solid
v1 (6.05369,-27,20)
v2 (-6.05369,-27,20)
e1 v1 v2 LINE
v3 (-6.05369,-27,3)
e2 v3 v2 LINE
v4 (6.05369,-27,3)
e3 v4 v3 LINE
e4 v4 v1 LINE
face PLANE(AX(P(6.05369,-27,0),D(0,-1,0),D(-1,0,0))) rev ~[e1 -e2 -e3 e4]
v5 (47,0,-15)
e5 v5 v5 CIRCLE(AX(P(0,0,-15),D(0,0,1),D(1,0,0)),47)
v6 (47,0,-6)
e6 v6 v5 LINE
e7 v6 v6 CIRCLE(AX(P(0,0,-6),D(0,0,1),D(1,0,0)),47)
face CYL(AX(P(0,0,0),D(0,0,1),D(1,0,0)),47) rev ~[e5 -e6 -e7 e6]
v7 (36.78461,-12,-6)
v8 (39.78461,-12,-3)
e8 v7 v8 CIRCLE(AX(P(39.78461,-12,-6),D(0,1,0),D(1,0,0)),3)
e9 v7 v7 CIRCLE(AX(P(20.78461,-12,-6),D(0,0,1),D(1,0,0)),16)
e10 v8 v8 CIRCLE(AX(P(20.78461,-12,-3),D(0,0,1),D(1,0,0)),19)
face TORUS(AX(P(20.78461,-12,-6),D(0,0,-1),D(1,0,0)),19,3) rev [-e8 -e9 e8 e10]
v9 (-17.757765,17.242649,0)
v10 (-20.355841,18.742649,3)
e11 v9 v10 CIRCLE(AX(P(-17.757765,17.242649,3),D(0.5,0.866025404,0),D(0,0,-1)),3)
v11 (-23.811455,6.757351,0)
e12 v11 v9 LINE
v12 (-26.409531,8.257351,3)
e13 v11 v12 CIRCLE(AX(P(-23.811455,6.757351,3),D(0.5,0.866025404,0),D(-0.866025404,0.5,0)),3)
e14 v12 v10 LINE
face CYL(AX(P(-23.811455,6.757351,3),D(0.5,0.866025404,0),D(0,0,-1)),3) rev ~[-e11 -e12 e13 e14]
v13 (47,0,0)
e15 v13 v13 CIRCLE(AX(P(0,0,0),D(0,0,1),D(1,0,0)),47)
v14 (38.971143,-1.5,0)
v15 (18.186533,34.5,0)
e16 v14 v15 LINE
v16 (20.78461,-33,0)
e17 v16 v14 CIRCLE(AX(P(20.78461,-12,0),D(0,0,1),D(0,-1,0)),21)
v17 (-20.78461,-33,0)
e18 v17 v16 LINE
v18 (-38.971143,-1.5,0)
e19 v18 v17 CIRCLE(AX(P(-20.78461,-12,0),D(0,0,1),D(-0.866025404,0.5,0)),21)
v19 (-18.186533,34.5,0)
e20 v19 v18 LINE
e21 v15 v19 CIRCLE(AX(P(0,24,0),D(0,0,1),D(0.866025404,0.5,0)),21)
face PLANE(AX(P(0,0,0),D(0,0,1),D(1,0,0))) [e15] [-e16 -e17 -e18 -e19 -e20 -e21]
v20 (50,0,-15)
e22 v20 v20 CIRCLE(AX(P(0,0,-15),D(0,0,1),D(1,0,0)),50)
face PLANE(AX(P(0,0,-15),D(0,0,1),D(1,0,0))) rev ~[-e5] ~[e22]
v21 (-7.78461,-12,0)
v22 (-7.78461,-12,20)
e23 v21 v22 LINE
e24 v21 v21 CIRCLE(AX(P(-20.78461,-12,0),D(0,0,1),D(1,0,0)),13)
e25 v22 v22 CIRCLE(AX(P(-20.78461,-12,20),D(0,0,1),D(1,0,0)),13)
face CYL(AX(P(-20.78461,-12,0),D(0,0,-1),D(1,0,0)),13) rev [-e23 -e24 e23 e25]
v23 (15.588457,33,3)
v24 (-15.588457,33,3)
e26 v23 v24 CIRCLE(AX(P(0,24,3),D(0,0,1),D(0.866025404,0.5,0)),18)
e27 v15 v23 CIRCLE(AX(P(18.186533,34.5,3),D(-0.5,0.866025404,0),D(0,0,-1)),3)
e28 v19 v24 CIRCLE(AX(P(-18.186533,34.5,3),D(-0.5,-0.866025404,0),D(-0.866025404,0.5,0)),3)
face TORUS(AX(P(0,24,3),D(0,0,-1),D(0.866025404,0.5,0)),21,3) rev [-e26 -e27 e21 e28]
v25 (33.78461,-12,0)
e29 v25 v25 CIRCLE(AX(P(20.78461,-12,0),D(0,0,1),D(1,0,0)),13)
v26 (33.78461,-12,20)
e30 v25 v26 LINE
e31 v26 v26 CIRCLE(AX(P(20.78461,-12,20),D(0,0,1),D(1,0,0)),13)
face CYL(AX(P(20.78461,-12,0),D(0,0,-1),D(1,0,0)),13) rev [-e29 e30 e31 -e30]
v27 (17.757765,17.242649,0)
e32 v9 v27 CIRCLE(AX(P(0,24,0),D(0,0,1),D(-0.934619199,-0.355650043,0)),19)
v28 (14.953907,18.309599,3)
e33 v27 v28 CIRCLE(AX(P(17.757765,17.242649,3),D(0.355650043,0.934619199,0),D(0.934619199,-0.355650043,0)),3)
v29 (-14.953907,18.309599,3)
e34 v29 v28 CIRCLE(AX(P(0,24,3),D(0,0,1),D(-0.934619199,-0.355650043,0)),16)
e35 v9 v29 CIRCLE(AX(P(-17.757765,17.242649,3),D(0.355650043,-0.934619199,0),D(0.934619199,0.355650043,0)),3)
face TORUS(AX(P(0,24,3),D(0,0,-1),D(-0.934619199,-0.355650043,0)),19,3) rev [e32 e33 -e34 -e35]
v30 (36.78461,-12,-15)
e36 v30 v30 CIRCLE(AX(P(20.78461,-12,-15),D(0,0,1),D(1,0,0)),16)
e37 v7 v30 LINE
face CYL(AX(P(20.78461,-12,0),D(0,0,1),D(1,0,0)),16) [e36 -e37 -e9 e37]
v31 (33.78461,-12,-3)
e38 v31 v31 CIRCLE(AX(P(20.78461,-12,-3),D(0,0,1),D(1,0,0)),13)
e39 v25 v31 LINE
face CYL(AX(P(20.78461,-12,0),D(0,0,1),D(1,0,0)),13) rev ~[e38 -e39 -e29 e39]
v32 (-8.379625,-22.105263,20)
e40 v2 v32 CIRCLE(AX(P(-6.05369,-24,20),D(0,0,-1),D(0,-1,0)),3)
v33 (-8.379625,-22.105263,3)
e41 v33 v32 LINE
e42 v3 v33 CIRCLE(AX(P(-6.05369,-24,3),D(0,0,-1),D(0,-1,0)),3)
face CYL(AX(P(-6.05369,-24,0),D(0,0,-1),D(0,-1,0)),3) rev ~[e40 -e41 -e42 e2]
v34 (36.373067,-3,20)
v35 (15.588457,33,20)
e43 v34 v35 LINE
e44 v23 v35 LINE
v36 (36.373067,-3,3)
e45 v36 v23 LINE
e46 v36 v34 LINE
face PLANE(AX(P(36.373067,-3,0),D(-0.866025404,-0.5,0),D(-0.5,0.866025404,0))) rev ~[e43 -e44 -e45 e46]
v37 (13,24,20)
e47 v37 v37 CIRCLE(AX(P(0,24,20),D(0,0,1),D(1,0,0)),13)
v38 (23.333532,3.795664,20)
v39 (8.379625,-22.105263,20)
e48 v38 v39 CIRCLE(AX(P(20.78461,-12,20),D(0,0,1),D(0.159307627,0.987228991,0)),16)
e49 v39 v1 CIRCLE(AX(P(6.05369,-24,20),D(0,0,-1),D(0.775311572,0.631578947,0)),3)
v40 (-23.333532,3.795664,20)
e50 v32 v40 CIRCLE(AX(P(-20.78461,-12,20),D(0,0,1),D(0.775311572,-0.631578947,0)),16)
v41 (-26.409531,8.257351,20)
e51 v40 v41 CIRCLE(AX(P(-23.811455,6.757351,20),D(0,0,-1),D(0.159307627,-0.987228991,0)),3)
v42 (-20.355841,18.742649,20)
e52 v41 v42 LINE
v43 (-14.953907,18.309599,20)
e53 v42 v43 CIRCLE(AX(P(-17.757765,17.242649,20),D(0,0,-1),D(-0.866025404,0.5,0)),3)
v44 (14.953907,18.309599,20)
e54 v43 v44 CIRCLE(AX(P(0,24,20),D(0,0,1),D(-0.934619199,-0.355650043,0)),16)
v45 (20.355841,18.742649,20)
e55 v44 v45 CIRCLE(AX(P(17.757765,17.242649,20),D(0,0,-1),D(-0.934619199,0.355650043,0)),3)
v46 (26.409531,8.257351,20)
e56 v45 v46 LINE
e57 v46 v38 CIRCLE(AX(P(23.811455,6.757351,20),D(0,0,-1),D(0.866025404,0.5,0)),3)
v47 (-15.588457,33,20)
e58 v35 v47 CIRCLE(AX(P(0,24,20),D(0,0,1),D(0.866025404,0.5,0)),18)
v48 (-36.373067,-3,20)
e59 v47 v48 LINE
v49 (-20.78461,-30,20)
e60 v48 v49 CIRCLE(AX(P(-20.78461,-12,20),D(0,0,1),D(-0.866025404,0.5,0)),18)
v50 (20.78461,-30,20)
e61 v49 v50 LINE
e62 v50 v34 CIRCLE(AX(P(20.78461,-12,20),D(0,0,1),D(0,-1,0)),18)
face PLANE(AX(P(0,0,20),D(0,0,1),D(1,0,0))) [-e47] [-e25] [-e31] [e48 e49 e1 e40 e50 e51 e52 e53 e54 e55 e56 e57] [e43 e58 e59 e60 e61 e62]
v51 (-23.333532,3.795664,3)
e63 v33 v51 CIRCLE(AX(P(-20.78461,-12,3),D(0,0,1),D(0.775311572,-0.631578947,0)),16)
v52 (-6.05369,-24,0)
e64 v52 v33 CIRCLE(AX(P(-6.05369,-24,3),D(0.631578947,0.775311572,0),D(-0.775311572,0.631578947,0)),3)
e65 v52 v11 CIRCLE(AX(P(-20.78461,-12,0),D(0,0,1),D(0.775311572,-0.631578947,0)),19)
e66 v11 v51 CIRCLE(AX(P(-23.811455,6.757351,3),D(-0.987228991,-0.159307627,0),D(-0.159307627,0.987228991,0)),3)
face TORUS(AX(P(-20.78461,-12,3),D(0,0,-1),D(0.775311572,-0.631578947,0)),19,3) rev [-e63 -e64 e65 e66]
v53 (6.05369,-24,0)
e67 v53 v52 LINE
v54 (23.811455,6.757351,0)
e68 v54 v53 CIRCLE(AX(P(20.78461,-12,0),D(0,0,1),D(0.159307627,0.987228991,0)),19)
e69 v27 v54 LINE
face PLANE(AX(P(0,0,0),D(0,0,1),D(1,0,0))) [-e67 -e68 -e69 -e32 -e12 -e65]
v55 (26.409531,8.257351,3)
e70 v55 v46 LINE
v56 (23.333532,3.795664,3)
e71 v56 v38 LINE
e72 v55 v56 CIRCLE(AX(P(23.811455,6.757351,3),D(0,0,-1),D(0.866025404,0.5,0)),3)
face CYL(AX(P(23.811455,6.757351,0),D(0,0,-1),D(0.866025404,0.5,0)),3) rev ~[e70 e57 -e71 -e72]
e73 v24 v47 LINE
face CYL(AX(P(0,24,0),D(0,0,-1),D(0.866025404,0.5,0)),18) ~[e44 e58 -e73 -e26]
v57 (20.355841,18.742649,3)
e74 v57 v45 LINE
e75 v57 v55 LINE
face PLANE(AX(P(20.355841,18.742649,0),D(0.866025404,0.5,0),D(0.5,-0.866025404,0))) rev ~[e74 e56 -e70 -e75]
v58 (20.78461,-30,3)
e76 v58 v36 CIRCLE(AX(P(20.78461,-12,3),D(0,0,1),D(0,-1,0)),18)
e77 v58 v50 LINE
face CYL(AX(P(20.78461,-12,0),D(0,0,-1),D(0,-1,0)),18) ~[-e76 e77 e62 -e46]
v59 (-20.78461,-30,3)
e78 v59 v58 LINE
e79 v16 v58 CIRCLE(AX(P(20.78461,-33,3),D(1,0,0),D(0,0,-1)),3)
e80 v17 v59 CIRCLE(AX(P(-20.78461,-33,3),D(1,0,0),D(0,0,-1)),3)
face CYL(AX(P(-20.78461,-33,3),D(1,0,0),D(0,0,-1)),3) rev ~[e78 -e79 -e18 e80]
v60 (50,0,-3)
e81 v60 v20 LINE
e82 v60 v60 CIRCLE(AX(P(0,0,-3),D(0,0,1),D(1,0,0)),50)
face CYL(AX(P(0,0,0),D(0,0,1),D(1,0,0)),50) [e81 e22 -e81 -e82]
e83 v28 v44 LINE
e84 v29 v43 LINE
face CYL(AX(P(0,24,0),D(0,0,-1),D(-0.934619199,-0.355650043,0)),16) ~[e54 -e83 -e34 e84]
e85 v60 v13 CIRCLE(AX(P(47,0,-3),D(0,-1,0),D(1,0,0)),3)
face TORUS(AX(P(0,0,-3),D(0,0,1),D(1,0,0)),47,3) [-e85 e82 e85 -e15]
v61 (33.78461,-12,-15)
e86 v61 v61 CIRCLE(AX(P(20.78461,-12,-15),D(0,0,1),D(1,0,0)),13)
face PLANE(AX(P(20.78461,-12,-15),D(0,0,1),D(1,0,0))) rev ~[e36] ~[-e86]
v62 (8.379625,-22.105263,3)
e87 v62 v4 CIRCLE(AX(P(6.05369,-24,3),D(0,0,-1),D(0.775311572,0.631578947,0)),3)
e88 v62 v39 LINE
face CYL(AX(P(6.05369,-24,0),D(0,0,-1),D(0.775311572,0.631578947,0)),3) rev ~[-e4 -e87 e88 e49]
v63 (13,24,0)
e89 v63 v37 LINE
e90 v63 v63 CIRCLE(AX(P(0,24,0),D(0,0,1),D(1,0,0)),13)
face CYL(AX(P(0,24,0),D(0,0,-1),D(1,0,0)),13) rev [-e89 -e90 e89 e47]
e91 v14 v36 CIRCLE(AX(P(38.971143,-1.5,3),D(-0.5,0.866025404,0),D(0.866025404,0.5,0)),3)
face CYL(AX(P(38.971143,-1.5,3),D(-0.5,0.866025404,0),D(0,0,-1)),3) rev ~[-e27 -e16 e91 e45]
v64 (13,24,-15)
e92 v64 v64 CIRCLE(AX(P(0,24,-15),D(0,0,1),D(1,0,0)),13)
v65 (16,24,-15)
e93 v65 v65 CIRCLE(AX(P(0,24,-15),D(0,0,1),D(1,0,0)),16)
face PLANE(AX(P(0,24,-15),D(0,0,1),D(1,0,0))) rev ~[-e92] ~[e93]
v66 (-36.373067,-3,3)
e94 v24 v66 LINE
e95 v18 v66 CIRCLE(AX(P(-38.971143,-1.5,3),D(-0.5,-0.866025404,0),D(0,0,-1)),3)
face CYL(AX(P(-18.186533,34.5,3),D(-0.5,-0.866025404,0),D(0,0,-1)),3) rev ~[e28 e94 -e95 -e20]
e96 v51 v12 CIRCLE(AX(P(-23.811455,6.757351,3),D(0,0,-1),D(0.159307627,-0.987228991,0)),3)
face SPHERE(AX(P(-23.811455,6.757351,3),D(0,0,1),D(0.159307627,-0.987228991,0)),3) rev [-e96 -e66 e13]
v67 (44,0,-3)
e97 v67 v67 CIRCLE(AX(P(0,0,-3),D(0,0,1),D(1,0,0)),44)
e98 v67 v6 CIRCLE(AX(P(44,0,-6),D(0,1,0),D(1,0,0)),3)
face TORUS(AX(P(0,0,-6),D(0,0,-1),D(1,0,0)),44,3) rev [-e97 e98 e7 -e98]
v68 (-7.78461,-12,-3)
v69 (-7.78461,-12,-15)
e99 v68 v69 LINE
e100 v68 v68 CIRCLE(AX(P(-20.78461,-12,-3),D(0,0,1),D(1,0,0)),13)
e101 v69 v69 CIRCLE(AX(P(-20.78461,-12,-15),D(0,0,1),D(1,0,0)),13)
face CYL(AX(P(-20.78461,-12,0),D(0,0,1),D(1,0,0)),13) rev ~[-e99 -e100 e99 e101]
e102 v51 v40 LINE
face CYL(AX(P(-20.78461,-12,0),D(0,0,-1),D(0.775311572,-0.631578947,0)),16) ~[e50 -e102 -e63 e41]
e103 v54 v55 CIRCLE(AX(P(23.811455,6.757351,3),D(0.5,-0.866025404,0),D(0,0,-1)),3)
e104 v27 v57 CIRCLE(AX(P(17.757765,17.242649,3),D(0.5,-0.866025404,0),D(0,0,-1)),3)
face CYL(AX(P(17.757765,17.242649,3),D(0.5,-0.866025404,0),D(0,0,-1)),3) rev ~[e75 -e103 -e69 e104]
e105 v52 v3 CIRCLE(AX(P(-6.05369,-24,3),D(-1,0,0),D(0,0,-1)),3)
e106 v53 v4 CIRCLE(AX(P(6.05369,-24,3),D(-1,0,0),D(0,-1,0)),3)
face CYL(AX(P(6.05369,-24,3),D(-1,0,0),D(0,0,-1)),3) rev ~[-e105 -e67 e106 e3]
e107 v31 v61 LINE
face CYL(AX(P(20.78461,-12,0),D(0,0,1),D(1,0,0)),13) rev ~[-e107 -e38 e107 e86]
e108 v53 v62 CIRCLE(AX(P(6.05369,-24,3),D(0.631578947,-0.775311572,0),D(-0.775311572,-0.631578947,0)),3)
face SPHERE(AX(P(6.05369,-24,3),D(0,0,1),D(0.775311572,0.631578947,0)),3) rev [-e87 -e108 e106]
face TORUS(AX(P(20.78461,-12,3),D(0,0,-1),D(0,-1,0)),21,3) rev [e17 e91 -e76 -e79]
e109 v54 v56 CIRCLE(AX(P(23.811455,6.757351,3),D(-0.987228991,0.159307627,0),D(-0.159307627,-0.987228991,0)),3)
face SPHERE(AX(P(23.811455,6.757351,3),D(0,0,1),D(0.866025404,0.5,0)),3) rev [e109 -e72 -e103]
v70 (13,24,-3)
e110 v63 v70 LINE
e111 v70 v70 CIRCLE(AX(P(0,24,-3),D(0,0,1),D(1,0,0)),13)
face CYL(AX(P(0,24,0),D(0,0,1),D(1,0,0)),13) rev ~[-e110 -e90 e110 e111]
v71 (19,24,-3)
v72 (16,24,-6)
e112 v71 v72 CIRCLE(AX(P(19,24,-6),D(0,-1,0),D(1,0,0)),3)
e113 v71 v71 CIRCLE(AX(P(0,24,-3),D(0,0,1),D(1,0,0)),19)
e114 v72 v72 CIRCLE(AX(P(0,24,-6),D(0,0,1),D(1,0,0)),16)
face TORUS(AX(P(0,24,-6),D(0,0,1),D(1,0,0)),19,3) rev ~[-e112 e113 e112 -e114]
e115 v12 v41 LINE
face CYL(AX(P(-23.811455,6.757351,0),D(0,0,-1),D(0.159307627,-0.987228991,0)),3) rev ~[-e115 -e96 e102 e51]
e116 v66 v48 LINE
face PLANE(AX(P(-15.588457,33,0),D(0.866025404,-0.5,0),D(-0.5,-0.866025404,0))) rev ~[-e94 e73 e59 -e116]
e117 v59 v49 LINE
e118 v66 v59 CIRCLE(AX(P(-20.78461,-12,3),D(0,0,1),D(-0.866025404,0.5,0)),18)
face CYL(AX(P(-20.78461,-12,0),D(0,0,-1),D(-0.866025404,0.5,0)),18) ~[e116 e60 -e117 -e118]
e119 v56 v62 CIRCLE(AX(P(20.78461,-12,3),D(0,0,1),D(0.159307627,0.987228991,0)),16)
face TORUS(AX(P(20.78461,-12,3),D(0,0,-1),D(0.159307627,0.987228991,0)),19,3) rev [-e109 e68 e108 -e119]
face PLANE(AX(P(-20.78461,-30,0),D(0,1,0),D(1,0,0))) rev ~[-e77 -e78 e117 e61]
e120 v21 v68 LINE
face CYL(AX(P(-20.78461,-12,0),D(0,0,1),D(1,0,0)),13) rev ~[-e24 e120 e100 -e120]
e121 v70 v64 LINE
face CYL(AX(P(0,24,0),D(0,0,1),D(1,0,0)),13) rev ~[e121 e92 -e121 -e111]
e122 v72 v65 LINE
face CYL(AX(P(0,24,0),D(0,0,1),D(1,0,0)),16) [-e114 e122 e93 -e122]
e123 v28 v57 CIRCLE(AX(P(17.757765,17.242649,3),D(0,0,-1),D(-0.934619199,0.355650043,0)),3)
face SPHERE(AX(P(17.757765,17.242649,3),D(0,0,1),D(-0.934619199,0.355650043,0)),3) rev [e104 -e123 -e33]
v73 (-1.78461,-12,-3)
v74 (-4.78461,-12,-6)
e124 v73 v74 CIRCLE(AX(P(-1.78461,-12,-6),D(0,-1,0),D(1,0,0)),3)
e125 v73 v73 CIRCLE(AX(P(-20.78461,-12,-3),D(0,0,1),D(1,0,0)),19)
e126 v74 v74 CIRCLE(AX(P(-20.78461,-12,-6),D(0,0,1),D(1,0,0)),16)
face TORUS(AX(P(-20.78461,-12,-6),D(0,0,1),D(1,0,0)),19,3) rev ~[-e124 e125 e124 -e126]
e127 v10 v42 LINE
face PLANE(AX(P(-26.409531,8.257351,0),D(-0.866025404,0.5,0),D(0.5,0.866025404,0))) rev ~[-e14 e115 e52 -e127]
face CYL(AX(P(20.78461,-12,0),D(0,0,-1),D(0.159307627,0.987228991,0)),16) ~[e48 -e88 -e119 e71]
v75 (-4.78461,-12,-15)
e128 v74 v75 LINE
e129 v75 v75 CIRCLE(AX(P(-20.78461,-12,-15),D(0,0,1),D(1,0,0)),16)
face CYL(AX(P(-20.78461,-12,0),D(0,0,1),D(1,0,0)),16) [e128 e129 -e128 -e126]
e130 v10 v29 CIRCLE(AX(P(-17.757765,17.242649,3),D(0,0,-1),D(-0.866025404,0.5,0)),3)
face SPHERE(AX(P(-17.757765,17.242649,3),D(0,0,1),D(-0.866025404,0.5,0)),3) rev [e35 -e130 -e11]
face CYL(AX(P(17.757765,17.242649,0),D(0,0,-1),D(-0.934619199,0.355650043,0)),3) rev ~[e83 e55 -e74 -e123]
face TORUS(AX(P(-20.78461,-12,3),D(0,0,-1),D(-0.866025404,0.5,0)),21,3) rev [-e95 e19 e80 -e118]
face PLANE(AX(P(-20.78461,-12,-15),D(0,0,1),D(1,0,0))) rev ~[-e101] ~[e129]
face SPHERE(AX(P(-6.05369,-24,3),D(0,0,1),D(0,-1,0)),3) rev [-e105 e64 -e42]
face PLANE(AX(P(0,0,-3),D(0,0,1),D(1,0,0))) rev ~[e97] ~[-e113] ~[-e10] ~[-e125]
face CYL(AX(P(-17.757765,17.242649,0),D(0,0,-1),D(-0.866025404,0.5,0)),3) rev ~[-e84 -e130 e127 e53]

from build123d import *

# Parameters (mm, degrees)
F1_R     = 50
F1_R_2   = 16
F1_R_3   = 13
F2_DEPTH = 15
F3_T     = -3
F0_R     = 13
F4_DEPTH = 20
F5_DEPTH = 15.001
F6_DEPTH = 15
F7_R     = 3


with BuildPart() as f2:
    # F1 (on Top) → F2 (new body)
    with BuildSketch(Plane.XY):
        Circle(F1_R)
        with Locations((-20.7846096908, -12)):
            Circle(F1_R_2, mode=Mode.SUBTRACT)
        with Locations((20.7846096908, -12)):
            Circle(F1_R_2, mode=Mode.SUBTRACT)
        with Locations((0, 24)):
            Circle(F1_R_2, mode=Mode.SUBTRACT)
        with Locations((-20.7846096908, -12)):
            Circle(F1_R_2)
        with Locations((-20.7846096908, -12)):
            Circle(F1_R_3, mode=Mode.SUBTRACT)
        with Locations((-20.7846096908, -12)):
            Circle(F1_R_3)
        with Locations((0, 24)):
            Circle(F1_R_2)
        with Locations((0, 24)):
            Circle(F1_R_3, mode=Mode.SUBTRACT)
        with Locations((0, 24)):
            Circle(F1_R_3)
        with Locations((20.7846096908, -12)):
            Circle(F1_R_2)
        with Locations((20.7846096908, -12)):
            Circle(F1_R_3, mode=Mode.SUBTRACT)
        with Locations((20.7846096908, -12)):
            Circle(F1_R_3)
    extrude(amount=-F2_DEPTH)

    # F3
    f3_openings = [f2.faces().sort_by_distance(p)[0] for p in [
        (0, 0, -15),
    ]]
    offset(amount=F3_T, openings=f3_openings)

    # F0 (on Top) → F4 (join)
    with BuildSketch(Plane.XY):
        with BuildLine():
            ThreePointArc((15.5884572681, 33), (0, 42), (-15.5884572681, 33))
            Line((-15.5884572681, 33), (-36.3730669589, -3))
            ThreePointArc((-36.3730669589, -3), (-36.3730669589, -21), (-20.7846096908, -30))
            Line((-20.7846096908, -30), (20.7846096908, -30))
            ThreePointArc((20.7846096908, -30), (36.3730669589, -21), (36.3730669589, -3))
            Line((36.3730669589, -3), (15.5884572681, 33))
        make_face()
        with Locations((-20.7846096908, -12)):
            Circle(F0_R, mode=Mode.SUBTRACT)
        with BuildLine():
            ThreePointArc((-20.3558409881, 18.7426491778), (-17.5180367181, 20.2330555813), (-14.9539071804, 18.3095993076))
            ThreePointArc((-14.9539071804, 18.3095993076), (0, 8), (14.9539071804, 18.3095993076))
            ThreePointArc((14.9539071804, 18.3095993076), (17.5180367181, 20.2330555813), (20.3558409881, 18.7426491778))
            Line((20.3558409881, 18.7426491778), (26.4095308163, 8.2573508222))
            ThreePointArc((26.4095308163, 8.2573508222), (26.2813584886, 5.0545370316), (23.3335317237, 3.7956638503))
            ThreePointArc((23.3335317237, 3.7956638503), (6.9282032303, -4), (8.3796245433, -22.1052631579))
            ThreePointArc((8.3796245433, -22.1052631579), (8.7633217705, -25.2875926129), (6.0536898282, -27))
            Line((6.0536898282, -27), (-6.0536898282, -27))
            ThreePointArc((-6.0536898282, -27), (-8.7633217705, -25.2875926129), (-8.3796245433, -22.1052631579))
            ThreePointArc((-8.3796245433, -22.1052631579), (-6.9282032303, -4), (-23.3335317237, 3.7956638503))
            ThreePointArc((-23.3335317237, 3.7956638503), (-26.2813584886, 5.0545370316), (-26.4095308163, 8.2573508222))
            Line((-26.4095308163, 8.2573508222), (-20.3558409881, 18.7426491778))
        make_face(mode=Mode.SUBTRACT)
        with Locations((20.7846096908, -12)):
            Circle(F0_R, mode=Mode.SUBTRACT)
        with Locations((0, 24)):
            Circle(F0_R, mode=Mode.SUBTRACT)
    extrude(amount=F4_DEPTH)

    # F0 (on Top) → F5 (cut, through all)
    with BuildSketch(Plane.XY):
        with Locations((0, 24)):
            Circle(F0_R)
        with Locations((-20.7846096908, -12)):
            Circle(F0_R)
        with Locations((20.7846096908, -12)):
            Circle(F0_R)
    extrude(amount=-F5_DEPTH, mode=Mode.SUBTRACT)

    # F1 (on Top) → F6 (join, through all)
    with BuildSketch(Plane.XY):
        with Locations((0, 24)):
            Circle(F1_R_2)
        with Locations((0, 24)):
            Circle(F1_R_3, mode=Mode.SUBTRACT)
        with Locations((20.7846096908, -12)):
            Circle(F1_R_2)
        with Locations((20.7846096908, -12)):
            Circle(F1_R_3, mode=Mode.SUBTRACT)
        with Locations((-20.7846096908, -12)):
            Circle(F1_R_2)
        with Locations((-20.7846096908, -12)):
            Circle(F1_R_3, mode=Mode.SUBTRACT)
    extrude(amount=-F6_DEPTH)

    # F7
    f7_edges = [f2.edges().sort_by_distance(p)[0] for p in [
        (23.382686, 13.5, 0),
        (0, -30, 0),
        (-50, 0, 0),
        (-47, 0, -3),
        (-36.78461, -12, -3),
        (4.78461, -12, -3),
        (-16, 24, -3),
        (-26.281358, 5.054537, 0),
        (-23.382686, 13.5, 0),
        (-6.928203, -4, 0),
        (-8.763322, -25.287593, 0),
        (0, -27, 0),
        (8.763322, -25.287593, 0),
        (6.928203, -4, 0),
        (26.281358, 5.054537, 0),
        (17.518037, 20.233056, 0),
        (0, 8, 0),
        (-17.518037, 20.233056, 0),
        (25.980762, 15, 0),
        (36.373067, -21, 0),
        (-36.373067, -21, 0),
        (-25.980762, 15, 0),
        (0, 42, 0),
    ]]
    fillet(f7_edges, radius=F7_R)


solid = f2.part
